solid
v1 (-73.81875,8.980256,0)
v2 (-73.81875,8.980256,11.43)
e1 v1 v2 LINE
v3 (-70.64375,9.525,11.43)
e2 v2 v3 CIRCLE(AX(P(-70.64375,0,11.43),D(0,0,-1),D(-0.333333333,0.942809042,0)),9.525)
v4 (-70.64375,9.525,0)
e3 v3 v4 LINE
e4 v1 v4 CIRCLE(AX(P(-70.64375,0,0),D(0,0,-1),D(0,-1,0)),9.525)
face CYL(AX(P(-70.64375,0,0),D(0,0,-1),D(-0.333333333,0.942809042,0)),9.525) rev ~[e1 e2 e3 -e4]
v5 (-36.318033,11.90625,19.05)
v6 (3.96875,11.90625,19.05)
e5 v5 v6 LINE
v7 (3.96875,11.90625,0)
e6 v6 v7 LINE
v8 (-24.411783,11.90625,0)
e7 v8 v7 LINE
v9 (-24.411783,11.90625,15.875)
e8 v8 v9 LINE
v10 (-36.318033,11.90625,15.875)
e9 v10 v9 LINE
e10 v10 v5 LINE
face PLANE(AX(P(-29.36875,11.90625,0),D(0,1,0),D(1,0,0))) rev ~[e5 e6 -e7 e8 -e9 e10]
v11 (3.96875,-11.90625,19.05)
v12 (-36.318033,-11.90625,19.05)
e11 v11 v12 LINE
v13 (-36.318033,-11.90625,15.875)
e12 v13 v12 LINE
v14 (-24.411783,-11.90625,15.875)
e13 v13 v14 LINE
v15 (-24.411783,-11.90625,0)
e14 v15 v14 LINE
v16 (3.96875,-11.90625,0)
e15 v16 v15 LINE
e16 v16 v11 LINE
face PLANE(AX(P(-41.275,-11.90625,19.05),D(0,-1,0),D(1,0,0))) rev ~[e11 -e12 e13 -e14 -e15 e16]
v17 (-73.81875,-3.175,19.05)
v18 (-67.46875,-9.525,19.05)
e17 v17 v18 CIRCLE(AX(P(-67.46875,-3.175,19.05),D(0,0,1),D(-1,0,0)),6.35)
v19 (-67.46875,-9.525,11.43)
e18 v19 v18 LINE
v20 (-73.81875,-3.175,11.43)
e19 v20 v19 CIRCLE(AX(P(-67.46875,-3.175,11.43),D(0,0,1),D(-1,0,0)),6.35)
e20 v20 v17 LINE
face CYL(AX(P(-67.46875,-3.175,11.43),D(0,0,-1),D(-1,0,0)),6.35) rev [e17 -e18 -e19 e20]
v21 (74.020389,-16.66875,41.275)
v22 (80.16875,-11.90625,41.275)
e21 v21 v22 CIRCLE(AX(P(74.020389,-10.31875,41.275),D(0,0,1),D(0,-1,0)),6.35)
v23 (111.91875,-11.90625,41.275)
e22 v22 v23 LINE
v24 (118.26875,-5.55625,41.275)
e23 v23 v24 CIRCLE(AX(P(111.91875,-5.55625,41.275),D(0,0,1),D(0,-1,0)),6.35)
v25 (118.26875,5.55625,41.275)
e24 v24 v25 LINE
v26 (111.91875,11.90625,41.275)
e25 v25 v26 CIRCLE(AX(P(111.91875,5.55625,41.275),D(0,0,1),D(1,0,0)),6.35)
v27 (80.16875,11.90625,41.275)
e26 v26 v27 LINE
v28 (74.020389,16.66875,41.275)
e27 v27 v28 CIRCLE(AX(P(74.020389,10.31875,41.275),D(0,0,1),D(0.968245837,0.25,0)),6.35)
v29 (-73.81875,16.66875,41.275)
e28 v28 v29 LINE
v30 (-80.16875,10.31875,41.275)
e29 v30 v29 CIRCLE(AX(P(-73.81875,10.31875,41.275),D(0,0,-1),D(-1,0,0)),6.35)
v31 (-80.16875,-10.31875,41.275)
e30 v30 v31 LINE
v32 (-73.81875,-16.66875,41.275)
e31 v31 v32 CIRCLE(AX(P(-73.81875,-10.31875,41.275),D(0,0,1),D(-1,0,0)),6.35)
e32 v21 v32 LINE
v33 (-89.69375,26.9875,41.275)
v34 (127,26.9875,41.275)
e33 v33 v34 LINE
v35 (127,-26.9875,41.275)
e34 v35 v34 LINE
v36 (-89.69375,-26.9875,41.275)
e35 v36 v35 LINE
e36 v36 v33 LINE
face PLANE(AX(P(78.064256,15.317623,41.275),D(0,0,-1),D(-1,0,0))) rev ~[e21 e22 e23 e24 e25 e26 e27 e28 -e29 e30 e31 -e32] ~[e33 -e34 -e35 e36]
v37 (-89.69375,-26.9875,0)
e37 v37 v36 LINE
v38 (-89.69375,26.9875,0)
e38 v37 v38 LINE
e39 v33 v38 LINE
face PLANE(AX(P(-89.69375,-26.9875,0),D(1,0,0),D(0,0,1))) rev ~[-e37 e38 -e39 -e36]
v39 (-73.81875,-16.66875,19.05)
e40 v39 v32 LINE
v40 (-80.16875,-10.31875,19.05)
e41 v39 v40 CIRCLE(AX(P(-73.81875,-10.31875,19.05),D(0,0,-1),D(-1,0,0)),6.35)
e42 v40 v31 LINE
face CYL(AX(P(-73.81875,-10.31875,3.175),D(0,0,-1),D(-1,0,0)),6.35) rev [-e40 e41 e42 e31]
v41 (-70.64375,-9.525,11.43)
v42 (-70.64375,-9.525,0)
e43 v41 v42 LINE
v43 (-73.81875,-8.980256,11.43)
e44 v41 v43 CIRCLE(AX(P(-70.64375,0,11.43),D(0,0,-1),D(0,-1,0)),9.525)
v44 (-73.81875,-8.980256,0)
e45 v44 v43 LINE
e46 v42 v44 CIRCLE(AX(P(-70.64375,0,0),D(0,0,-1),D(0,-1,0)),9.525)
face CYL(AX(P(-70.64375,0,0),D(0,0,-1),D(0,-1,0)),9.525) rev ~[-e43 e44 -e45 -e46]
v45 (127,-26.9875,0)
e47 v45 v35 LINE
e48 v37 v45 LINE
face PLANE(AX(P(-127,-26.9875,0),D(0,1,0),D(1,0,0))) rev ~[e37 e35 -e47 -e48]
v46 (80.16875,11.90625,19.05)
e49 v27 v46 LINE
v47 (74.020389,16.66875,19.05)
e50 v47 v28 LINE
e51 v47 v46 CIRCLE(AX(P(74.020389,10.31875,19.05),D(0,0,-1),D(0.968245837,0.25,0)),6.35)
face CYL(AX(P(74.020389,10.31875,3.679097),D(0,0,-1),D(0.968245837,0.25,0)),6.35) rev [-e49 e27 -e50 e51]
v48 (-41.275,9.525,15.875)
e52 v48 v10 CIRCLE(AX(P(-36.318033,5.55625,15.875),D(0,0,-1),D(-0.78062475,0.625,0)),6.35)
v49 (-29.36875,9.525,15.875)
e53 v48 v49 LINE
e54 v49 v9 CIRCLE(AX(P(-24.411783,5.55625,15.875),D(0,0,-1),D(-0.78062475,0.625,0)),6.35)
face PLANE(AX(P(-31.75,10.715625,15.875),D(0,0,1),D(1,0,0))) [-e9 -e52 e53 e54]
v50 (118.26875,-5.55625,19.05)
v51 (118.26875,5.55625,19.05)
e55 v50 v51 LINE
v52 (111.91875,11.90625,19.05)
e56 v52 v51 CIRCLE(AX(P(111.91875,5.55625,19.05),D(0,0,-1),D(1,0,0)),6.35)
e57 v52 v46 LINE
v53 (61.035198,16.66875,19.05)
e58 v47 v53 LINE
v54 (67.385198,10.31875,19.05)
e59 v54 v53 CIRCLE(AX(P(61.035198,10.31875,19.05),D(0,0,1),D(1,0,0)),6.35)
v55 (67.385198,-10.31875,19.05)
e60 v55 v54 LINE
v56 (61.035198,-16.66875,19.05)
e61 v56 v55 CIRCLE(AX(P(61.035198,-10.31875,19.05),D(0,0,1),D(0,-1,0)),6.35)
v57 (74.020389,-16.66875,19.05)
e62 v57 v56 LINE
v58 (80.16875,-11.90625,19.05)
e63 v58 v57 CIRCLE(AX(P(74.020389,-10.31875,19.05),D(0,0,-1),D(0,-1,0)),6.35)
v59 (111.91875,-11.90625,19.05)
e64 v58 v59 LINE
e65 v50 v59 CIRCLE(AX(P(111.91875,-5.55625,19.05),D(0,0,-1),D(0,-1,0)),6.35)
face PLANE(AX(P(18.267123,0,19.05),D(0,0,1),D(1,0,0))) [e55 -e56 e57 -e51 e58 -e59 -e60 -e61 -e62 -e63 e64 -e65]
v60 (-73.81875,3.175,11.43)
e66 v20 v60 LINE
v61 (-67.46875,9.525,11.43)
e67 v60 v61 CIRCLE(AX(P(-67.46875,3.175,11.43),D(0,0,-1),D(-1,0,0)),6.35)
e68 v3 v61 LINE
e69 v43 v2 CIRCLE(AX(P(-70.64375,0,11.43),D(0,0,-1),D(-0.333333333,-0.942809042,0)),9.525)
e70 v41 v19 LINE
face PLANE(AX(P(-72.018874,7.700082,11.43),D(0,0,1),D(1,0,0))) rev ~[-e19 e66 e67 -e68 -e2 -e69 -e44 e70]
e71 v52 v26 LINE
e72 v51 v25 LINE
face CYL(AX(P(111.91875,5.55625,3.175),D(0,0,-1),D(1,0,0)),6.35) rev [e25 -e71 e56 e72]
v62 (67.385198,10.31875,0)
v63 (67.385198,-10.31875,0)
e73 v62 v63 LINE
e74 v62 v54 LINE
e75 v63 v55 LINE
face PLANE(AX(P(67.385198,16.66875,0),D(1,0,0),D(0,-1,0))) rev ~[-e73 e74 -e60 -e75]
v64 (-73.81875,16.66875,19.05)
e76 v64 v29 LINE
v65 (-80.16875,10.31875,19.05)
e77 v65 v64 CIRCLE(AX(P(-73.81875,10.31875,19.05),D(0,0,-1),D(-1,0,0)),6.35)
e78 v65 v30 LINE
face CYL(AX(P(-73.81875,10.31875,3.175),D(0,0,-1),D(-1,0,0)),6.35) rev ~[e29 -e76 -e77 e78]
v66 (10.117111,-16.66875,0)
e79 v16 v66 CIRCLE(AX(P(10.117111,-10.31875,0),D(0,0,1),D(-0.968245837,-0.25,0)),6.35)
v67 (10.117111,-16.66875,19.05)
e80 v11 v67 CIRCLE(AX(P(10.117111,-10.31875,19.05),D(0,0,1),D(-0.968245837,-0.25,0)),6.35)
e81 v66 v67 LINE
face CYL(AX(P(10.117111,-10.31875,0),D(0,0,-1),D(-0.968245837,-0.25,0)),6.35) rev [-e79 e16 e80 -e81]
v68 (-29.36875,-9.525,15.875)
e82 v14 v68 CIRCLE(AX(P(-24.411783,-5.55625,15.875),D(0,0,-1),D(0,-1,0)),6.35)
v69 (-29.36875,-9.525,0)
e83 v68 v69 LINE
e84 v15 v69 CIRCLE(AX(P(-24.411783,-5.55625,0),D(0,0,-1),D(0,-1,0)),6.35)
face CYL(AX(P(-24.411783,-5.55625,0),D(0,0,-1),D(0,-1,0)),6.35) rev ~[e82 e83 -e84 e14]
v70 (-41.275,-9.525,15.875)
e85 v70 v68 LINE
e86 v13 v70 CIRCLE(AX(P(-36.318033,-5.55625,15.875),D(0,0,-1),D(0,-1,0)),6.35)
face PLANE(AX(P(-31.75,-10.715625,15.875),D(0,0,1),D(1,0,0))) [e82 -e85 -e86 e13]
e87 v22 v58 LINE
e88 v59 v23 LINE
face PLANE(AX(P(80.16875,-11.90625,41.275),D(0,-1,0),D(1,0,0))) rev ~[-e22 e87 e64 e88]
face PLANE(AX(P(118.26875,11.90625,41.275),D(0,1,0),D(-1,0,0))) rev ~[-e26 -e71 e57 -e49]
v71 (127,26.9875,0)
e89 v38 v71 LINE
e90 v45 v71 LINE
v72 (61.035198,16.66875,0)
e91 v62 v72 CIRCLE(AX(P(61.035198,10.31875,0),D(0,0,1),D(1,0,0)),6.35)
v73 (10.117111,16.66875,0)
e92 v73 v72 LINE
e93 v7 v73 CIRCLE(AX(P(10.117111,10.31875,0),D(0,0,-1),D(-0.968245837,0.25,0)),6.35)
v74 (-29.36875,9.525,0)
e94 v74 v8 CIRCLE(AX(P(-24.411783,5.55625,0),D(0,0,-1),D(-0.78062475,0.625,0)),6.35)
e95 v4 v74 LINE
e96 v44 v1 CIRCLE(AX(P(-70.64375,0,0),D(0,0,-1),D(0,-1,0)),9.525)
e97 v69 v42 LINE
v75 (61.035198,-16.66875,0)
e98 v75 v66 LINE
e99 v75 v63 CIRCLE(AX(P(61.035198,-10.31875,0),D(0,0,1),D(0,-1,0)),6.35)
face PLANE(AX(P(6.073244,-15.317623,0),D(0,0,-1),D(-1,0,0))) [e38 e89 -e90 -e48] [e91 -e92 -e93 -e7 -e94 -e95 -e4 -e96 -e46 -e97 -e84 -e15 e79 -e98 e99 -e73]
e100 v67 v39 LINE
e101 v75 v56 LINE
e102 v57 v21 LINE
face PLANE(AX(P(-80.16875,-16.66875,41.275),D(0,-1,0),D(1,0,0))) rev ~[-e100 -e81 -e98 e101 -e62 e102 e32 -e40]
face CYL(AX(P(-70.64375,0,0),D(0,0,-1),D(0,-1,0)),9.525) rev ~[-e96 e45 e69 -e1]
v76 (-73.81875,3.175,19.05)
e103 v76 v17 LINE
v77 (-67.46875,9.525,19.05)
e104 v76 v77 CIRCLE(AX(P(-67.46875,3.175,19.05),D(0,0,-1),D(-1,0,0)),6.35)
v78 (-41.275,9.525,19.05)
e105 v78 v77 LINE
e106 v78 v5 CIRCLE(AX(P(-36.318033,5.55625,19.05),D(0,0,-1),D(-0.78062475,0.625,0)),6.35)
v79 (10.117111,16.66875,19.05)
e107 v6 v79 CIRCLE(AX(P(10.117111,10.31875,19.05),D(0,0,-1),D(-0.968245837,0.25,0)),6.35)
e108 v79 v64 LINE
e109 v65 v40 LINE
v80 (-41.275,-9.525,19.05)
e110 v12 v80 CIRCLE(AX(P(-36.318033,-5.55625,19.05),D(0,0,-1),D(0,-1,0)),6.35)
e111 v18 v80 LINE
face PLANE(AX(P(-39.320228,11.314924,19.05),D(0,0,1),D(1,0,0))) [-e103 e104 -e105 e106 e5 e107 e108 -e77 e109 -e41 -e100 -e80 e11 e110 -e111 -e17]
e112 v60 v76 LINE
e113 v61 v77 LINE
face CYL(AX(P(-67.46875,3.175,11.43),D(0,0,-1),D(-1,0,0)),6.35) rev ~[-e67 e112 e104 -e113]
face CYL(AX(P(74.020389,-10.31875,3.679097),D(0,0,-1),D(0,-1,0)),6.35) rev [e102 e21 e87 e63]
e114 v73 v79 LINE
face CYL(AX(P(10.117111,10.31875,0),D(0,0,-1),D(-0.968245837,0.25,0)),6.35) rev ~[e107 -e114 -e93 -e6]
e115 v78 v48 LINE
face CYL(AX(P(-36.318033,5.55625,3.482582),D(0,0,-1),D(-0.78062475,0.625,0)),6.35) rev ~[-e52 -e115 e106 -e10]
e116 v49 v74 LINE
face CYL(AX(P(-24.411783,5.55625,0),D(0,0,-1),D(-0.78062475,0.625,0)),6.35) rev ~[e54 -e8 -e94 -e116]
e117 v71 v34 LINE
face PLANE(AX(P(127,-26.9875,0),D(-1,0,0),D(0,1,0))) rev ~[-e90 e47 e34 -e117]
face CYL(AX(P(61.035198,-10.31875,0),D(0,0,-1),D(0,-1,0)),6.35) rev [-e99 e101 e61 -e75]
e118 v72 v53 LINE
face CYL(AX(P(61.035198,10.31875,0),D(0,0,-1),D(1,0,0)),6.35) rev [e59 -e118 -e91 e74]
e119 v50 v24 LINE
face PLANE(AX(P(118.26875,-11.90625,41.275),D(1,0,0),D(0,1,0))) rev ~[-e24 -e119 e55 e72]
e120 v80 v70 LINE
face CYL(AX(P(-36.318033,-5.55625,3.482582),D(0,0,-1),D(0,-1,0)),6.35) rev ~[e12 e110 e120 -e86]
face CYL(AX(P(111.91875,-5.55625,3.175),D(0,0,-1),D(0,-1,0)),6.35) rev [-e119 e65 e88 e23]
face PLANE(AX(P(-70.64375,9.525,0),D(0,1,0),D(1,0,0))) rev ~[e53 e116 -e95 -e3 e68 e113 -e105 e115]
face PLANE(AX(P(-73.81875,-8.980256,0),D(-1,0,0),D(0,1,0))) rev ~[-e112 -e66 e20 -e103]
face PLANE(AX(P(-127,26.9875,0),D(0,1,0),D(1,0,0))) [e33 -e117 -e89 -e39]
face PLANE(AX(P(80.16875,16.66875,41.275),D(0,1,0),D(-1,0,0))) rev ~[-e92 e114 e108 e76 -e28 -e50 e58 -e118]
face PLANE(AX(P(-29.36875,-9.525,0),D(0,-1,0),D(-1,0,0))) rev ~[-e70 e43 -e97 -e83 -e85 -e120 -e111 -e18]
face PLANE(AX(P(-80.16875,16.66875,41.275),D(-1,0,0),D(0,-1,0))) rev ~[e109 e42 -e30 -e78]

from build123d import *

# Parameters (mm, degrees)
F0_W         = 254
F0_H         = 53.975
F1_DEPTH     = 41.275
F3_DEPTH     = 22.225
F4_T1_DEPTH  = 38.1
F4_T3_DEPTH  = 37.5959026553
F6_DEPTH     = 11.43
F8_DEPTH     = 41.276
F9_T1_DEPTH  = 19.05
F9_T3_DEPTH  = 7.62
F10_W        = 37.30625
F10_H        = 41.275
F11_DEPTH    = 53.976
F12_W        = 19.05
F12_H        = 2.38125
F13_DEPTH    = 3.175
F14_T1_DEPTH = 15.5674179031


# Not quite as in the source:
# - a fillet or chamfer that OpenCascade refuses, or shapes differently, is made with other operations: its cross-section is extruded or revolved along the edge and cut away or added


with BuildPart() as f1:
    # F0 (on Top) → F1 (new body)
    with BuildSketch(Plane.XY):
        Rectangle(F0_W, F0_H)
    extrude(amount=F1_DEPTH)

    # F2 (on face) → F3 (cut)
    with BuildSketch(Plane.XY.offset(41.275)):
        Polygon((-80.16875, 16.66875), (-80.16875, -16.66875), (80.16875, -16.66875), (80.16875, -11.90625), (118.26875, -11.90625), (118.26875, 11.90625), (80.16875, 11.90625), (80.16875, 16.66875), align=None)
    extrude(amount=-F3_DEPTH, mode=Mode.SUBTRACT)

    # F4: fillet of radius 6.35 on 6 edges, made by hand

    # F4_s2 → F4_t1 (join)
    with BuildSketch(Plane.XY.offset(3.175)):
        with BuildLine():
            ThreePointArc((-80.16875, -10.31875), (-78.3088780605, -14.8088780605), (-73.81875, -16.66875))
            Line((-73.81875, -16.66875), (-80.16875, -16.66875))
            Line((-80.16875, -16.66875), (-80.16875, -10.31875))
        make_face()
        with BuildLine():
            ThreePointArc((111.91875, -11.90625), (116.4088780605, -10.0463780605), (118.26875, -5.55625))
            Line((118.26875, -5.55625), (118.26875, -11.90625))
            Line((118.26875, -11.90625), (111.91875, -11.90625))
        make_face()
        with BuildLine():
            ThreePointArc((118.26875, 5.55625), (116.4088780605, 10.0463780605), (111.91875, 11.90625))
            Line((111.91875, 11.90625), (118.26875, 11.90625))
            Line((118.26875, 11.90625), (118.26875, 5.55625))
        make_face()
        with BuildLine():
            ThreePointArc((-80.16875, 10.31875), (-78.3088780605, 14.8088780605), (-73.81875, 16.66875))
            Line((-73.81875, 16.66875), (-80.16875, 16.66875))
            Line((-80.16875, 16.66875), (-80.16875, 10.31875))
        make_face()
    extrude(amount=F4_T1_DEPTH)

    # F4_s4 → F4_t3 (join)
    with BuildSketch(Plane.XY.offset(3.6790973447)):
        with BuildLine():
            ThreePointArc((80.16875, 11.90625), (77.9089539046, 15.3388657855), (74.0203889379, 16.66875))
            Line((74.0203889379, 16.66875), (80.16875, 16.66875))
            Line((80.16875, 16.66875), (80.16875, 11.90625))
        make_face()
        with BuildLine():
            ThreePointArc((74.0203889379, -16.66875), (77.9089539046, -15.3388657855), (80.16875, -11.90625))
            Line((80.16875, -11.90625), (80.16875, -16.66875))
            Line((80.16875, -16.66875), (74.0203889379, -16.66875))
        make_face()
    extrude(amount=F4_T3_DEPTH)

    # F5 (on face) → F6 (cut)
    with BuildSketch(Plane(origin=(0, 0, 0), x_dir=(1, 0, 0), z_dir=(0, 0, -1))):
        with BuildLine():
            Line((-29.36875, 9.525), (-70.64375, 9.525))
            ThreePointArc((-70.64375, 9.525), (-80.16875, 0), (-70.64375, -9.525))
            Line((-70.64375, -9.525), (-29.36875, -9.525))
            Line((-29.36875, -9.525), (-29.36875, -11.90625))
            Line((-29.36875, -11.90625), (3.96875, -11.90625))
            Line((3.96875, -11.90625), (3.96875, -16.66875))
            Line((3.96875, -16.66875), (67.3851976236, -16.66875))
            Line((67.3851976236, -16.66875), (67.3851976236, 16.66875))
            Line((67.3851976236, 16.66875), (3.96875, 16.66875))
            Line((3.96875, 16.66875), (3.96875, 11.90625))
            Line((3.96875, 11.90625), (-29.36875, 11.90625))
            Line((-29.36875, 11.90625), (-29.36875, 9.525))
        make_face()
    extrude(amount=-F6_DEPTH, mode=Mode.SUBTRACT)

    # F7 (on face) → F8 (cut, through all)
    with BuildSketch(Plane(origin=(0, 0, 0), x_dir=(1, 0, 0), z_dir=(0, 0, -1))):
        with BuildLine():
            Line((-29.36875, 9.525), (-70.64375, 9.525))
            ThreePointArc((-70.64375, 9.525), (-72.2544463474, 9.3878262807), (-73.81875, 8.9802561211))
            Line((-73.81875, 8.9802561211), (-73.81875, -8.9802561211))
            ThreePointArc((-73.81875, -8.9802561211), (-72.2544463474, -9.3878262807), (-70.64375, -9.525))
            Line((-70.64375, -9.525), (-29.36875, -9.525))
            Line((-29.36875, -9.525), (-29.36875, -11.90625))
            Line((-29.36875, -11.90625), (3.96875, -11.90625))
            Line((3.96875, -11.90625), (3.96875, -16.66875))
            Line((3.96875, -16.66875), (67.3851976236, -16.66875))
            Line((67.3851976236, -16.66875), (67.3851976236, 16.66875))
            Line((67.3851976236, 16.66875), (3.96875, 16.66875))
            Line((3.96875, 16.66875), (3.96875, 11.90625))
            Line((3.96875, 11.90625), (-29.36875, 11.90625))
            Line((-29.36875, 11.90625), (-29.36875, 9.525))
        make_face()
    extrude(amount=-F8_DEPTH, mode=Mode.SUBTRACT)

    # F9: fillet of radius 6.35 on 8 edges, made by hand

    # F9_s2 → F9_t1 (join)
    with BuildSketch(Plane.XY):
        with BuildLine():
            ThreePointArc((3.96875, -11.90625), (6.2285460954, -15.3388657855), (10.1171110621, -16.66875))
            Line((10.1171110621, -16.66875), (3.96875, -16.66875))
            Line((3.96875, -16.66875), (3.96875, -11.90625))
        make_face()
        with BuildLine():
            ThreePointArc((-24.4117828388, -11.90625), (-27.1614134958, -11.2800626498), (-29.36875, -9.525))
            Line((-29.36875, -9.525), (-29.36875, -11.90625))
            Line((-29.36875, -11.90625), (-24.4117828388, -11.90625))
        make_face()
        with BuildLine():
            ThreePointArc((61.0351976236, -16.66875), (65.5253256842, -14.8088780605), (67.3851976236, -10.31875))
            Line((67.3851976236, -10.31875), (67.3851976236, -16.66875))
            Line((67.3851976236, -16.66875), (61.0351976236, -16.66875))
        make_face()
        with BuildLine():
            ThreePointArc((67.3851976236, 10.31875), (65.5253256842, 14.8088780605), (61.0351976236, 16.66875))
            Line((61.0351976236, 16.66875), (67.3851976236, 16.66875))
            Line((67.3851976236, 16.66875), (67.3851976236, 10.31875))
        make_face()
        with BuildLine():
            ThreePointArc((3.96875, 11.90625), (6.2285460954, 15.3388657855), (10.1171110621, 16.66875))
            Line((10.1171110621, 16.66875), (3.96875, 16.66875))
            Line((3.96875, 16.66875), (3.96875, 11.90625))
        make_face()
        with BuildLine():
            ThreePointArc((-29.36875, 9.525), (-27.1614134958, 11.2800626498), (-24.4117828388, 11.90625))
            Line((-24.4117828388, 11.90625), (-29.36875, 11.90625))
            Line((-29.36875, 11.90625), (-29.36875, 9.525))
        make_face()
    extrude(amount=F9_T1_DEPTH)

    # F9_s4 → F9_t3 (join)
    with BuildSketch(Plane.XY.offset(11.43)):
        with BuildLine():
            ThreePointArc((-73.81875, 3.175), (-71.9588780605, 7.6651280605), (-67.46875, 9.525))
            Line((-67.46875, 9.525), (-67.46875, 10.16))
            ThreePointArc((-67.46875, 10.16), (-70.64375, 10.16), (-74.0304166667, 9.5789398625))
            Line((-74.0304166667, 9.5789398625), (-74.45375, 8.9802561211))
            Line((-74.45375, 8.9802561211), (-74.45375, 3.175))
            Line((-74.45375, 3.175), (-73.81875, 3.175))
        make_face()
        with BuildLine():
            ThreePointArc((-73.81875, -3.175), (-71.9588780605, -7.6651280605), (-67.46875, -9.525))
            Line((-67.46875, -9.525), (-67.46875, -10.16))
            ThreePointArc((-67.46875, -10.16), (-70.64375, -10.16), (-74.0304166667, -9.5789398625))
            Line((-74.0304166667, -9.5789398625), (-74.45375, -8.9802561211))
            Line((-74.45375, -8.9802561211), (-74.45375, -3.175))
            Line((-74.45375, -3.175), (-73.81875, -3.175))
        make_face()
    extrude(amount=F9_T3_DEPTH)

    # F10 (on face) → F11 (cut, through all)
    with BuildSketch(Plane.XZ.offset(26.9875)):
        with Locations((-108.346875, 20.6375)):
            Rectangle(F10_W, F10_H)
    extrude(amount=-F11_DEPTH, mode=Mode.SUBTRACT)

    # F12 (on face) → F13 (cut)
    with BuildSketch(Plane.XY.offset(19.05)):
        with Locations((-31.75, 10.715625)):
            Rectangle(F12_W, F12_H)
        with Locations((-31.75, -10.715625)):
            Rectangle(F12_W, F12_H)
    extrude(amount=-F13_DEPTH, mode=Mode.SUBTRACT)

    # F14: fillet of radius 6.35 on 2 edges, made by hand

    # F14_s2 → F14_t1 (join)
    with BuildSketch(Plane.XY.offset(3.4825820969)):
        with BuildLine():
            ThreePointArc((-41.275, 9.525), (-39.0676634958, 11.2800626498), (-36.3180328388, 11.90625))
            Line((-36.3180328388, 11.90625), (-41.275, 11.90625))
            Line((-41.275, 11.90625), (-41.275, 9.525))
        make_face()
        with BuildLine():
            ThreePointArc((-36.3180328388, -11.90625), (-39.0676634958, -11.2800626498), (-41.275, -9.525))
            Line((-41.275, -9.525), (-41.275, -11.90625))
            Line((-41.275, -11.90625), (-36.3180328388, -11.90625))
        make_face()
    extrude(amount=F14_T1_DEPTH)


solid = f1.part
